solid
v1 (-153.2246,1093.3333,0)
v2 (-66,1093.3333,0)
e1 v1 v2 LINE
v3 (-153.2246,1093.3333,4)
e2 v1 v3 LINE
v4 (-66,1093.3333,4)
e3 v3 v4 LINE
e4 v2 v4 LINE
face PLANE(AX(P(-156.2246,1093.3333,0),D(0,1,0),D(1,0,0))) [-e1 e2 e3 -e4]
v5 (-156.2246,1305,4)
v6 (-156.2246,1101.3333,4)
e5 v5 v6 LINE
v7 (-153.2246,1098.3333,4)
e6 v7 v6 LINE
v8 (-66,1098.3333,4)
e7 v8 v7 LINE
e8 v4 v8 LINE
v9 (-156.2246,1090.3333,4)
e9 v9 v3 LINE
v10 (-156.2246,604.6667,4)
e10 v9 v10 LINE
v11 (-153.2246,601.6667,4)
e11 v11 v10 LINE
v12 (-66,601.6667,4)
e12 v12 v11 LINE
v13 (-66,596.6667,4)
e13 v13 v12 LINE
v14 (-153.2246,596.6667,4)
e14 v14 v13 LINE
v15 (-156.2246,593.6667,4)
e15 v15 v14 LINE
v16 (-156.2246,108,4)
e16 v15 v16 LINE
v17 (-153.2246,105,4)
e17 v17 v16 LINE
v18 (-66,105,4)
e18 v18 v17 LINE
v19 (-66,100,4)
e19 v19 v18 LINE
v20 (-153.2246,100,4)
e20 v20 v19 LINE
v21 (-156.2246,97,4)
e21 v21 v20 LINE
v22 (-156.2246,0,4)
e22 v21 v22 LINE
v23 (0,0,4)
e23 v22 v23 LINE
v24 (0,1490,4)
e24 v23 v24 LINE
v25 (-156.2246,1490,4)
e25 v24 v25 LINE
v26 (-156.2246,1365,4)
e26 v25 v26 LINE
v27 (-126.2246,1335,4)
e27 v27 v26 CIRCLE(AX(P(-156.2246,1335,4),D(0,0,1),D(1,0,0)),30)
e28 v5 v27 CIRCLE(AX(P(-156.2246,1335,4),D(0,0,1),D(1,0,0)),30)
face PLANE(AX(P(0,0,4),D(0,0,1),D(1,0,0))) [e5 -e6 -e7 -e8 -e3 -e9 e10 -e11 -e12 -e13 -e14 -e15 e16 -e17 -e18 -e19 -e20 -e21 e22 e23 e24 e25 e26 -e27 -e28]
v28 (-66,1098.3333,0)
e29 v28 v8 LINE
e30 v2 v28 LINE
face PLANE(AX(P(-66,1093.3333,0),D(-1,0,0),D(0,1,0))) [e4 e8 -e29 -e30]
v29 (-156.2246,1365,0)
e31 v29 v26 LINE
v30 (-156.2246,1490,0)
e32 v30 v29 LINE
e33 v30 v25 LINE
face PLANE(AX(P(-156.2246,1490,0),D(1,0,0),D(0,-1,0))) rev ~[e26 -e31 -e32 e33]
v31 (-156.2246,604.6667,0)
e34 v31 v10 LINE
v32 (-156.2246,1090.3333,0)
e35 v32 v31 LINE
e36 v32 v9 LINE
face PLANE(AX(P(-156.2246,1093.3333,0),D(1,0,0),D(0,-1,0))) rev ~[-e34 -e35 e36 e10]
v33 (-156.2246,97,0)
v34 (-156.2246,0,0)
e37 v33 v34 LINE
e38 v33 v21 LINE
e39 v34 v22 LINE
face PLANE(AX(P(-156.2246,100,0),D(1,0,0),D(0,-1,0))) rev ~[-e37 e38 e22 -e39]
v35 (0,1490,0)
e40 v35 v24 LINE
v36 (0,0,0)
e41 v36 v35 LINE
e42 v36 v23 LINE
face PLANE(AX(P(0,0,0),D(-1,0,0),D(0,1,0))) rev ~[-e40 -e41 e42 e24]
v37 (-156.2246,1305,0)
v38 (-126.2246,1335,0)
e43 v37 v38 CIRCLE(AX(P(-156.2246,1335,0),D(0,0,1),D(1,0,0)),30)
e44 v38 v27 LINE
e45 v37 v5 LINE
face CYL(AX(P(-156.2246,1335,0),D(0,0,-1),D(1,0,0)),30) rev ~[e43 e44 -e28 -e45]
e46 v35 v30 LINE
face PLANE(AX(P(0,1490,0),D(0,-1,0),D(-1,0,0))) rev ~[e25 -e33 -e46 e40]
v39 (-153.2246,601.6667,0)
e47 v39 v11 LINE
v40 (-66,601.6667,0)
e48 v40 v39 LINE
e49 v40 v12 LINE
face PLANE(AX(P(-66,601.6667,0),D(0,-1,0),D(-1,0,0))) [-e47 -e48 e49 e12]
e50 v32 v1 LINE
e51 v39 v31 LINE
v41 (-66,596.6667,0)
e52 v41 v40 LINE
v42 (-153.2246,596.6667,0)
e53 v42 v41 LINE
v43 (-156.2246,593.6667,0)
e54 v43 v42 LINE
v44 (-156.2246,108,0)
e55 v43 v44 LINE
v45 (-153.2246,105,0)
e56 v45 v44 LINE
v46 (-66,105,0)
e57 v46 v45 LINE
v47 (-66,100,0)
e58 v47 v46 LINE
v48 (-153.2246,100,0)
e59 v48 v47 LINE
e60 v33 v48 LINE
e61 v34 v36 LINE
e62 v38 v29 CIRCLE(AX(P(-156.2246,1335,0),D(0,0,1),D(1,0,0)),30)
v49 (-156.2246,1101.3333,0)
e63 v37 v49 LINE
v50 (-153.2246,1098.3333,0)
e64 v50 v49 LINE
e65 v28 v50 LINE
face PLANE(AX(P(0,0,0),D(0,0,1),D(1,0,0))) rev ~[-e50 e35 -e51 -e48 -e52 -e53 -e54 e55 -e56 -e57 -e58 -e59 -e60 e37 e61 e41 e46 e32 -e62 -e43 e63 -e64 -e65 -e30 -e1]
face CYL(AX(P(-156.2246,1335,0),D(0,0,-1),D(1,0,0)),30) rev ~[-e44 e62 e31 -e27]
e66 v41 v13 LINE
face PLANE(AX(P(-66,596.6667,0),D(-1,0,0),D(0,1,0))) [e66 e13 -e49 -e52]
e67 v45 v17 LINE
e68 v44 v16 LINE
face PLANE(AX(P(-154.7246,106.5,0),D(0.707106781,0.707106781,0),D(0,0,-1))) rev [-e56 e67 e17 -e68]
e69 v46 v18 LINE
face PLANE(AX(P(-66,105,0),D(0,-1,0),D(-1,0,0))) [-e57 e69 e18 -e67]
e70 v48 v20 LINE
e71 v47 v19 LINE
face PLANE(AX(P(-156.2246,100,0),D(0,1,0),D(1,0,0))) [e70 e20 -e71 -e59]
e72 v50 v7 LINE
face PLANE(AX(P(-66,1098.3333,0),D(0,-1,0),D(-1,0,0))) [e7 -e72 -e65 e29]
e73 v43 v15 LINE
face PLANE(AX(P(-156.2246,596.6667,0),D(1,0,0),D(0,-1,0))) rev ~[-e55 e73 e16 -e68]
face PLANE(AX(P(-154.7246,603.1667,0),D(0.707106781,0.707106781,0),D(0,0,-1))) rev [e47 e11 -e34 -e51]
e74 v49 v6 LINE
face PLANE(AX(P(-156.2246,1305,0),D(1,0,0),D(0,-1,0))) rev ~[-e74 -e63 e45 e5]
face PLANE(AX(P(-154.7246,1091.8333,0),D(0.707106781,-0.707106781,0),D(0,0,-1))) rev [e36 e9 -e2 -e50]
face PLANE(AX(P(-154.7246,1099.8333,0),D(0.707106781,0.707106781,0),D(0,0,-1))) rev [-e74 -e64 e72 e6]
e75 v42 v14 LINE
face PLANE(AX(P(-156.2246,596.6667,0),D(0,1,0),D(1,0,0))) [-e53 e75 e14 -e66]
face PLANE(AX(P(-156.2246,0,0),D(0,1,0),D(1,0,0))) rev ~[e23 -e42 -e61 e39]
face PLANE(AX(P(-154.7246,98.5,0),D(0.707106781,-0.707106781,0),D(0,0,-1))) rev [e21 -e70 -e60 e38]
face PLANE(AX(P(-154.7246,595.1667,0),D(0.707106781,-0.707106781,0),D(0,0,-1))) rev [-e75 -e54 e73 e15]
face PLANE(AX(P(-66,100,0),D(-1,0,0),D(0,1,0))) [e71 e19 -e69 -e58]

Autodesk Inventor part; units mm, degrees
ref_plane "YZ Plane" through (0, 0, 0) normal (1, 0, 0) x (0, 1, 0)
ref_plane "XZ Plane" through (0, 0, 0) normal (0, 1, 0) x (-1, 0, 0)
ref_plane "XY Plane" through (0, 0, 0) normal (0, 0, 1) x (1, 0, 0)
sketch "Sketch1" plane through (0, 0, 0) normal (0, 0, 1) x (1, 0, 0)
  line L0 (0, 1490) -> (-156.2246, 1490)
  line L1 (-156.2246, 1490) -> (-156.2246, 0)
  line L2 (-156.2246, 0) -> (0, 0)
  line L3 (0, 0) -> (0, 1490)
  line L4 (-156.2246, 100) -> (-66, 100)
  line L5 (-66, 100) -> (-66, 105)
  line L6 (-66, 105) -> (-156.2246, 105)
  line L7 (-156.2246, 105) -> (-156.2246, 100)
  line L8 (-156.2246, 596.6667) -> (-66, 596.6667)
  line L9 (-66, 596.6667) -> (-66, 601.6667)
  line L10 (-66, 601.6667) -> (-156.2246, 601.6667)
  line L11 (-156.2246, 601.6667) -> (-156.2246, 596.6667)
  line L12 (-156.2246, 1093.3333) -> (-66, 1093.3333)
  line L13 (-66, 1093.3333) -> (-66, 1098.3333)
  line L14 (-66, 1098.3333) -> (-156.2246, 1098.3333)
  line L15 (-156.2246, 1098.3333) -> (-156.2246, 1093.3333)
  circle A0 centre (-156.2246, 1335) radius 30
  point P0 (-156.2246, 601.6667)
  point P1 (-156.2246, 105)
  point P2 (-156.2246, 1365)
  point P3 (-156.2246, 1305)
  dimension "d0" = 1490
  dimension "d1" = 156.2246
  dimension "d2" = 5
  dimension "d4" = 100
  dimension "d7" = 496.6667
  dimension "d23" = 66
  dimension "d29" = 60
  dimension "d30" = 1335
extrude "Plate1" add sketch "Sketch1" along normal blind 4 contours L3 L2 L1 L4 L5 L6 L8 L9 L10 L12 L13 L14 A0 L0
chamfer "Corner Chamfer1" distance 3 angle 45 6 edges at (-156.2246, 100, 2) (-156.2246, 105, 2) (-156.2246, 596.6667, 2) (-156.2246, 601.6667, 2) (-156.2246, 1098.3333, 2) (-156.2246, 1093.3333, 2)
equation "\"d0\" = Стрингер_длина"
equation "\"d1\" = стрингер_глубина_4"
equation "\"d2\" = паз_под_стрингер_толщина"
equation "\"d7\" = Шаг_шпангоутов"
equation "\"d23\" = паз_под_стрингер_глубина - Thickness"
equation "\"d29\" = 2 * радиус_выреза_под_сварку"
equation "\"d12\" = Thickness"
equation "\"BendRadius\" = Thickness"
equation "\"BendReliefWidth\" = Thickness"
equation "\"BendReliefDepth\" = 0.5 * Thickness"
equation "\"CornerReliefSize\" = 4 * Thickness"
equation "\"MinimumRemnant\" = 2 * Thickness"
equation "\"TransitionRadius\" = BendRadius"
equation "\"JacobiRadiusSize\" = BendRadius"
equation "\"GapSize\" = Thickness"
equation "\"Стрингер_длина\" = 1490"
equation "\"стрингер_глубина_4\" = 156.224572"
equation "\"паз_под_стрингер_толщина\" = 5"
equation "\"Шаг_шпангоутов\" = 496.666667"
equation "\"паз_под_стрингер_глубина\" = 70"
equation "\"Thickness\" = 4"
equation "\"радиус_выреза_под_сварку\" = 30"
properties part number "GBK 3202 stringer 4" material "Steel"
